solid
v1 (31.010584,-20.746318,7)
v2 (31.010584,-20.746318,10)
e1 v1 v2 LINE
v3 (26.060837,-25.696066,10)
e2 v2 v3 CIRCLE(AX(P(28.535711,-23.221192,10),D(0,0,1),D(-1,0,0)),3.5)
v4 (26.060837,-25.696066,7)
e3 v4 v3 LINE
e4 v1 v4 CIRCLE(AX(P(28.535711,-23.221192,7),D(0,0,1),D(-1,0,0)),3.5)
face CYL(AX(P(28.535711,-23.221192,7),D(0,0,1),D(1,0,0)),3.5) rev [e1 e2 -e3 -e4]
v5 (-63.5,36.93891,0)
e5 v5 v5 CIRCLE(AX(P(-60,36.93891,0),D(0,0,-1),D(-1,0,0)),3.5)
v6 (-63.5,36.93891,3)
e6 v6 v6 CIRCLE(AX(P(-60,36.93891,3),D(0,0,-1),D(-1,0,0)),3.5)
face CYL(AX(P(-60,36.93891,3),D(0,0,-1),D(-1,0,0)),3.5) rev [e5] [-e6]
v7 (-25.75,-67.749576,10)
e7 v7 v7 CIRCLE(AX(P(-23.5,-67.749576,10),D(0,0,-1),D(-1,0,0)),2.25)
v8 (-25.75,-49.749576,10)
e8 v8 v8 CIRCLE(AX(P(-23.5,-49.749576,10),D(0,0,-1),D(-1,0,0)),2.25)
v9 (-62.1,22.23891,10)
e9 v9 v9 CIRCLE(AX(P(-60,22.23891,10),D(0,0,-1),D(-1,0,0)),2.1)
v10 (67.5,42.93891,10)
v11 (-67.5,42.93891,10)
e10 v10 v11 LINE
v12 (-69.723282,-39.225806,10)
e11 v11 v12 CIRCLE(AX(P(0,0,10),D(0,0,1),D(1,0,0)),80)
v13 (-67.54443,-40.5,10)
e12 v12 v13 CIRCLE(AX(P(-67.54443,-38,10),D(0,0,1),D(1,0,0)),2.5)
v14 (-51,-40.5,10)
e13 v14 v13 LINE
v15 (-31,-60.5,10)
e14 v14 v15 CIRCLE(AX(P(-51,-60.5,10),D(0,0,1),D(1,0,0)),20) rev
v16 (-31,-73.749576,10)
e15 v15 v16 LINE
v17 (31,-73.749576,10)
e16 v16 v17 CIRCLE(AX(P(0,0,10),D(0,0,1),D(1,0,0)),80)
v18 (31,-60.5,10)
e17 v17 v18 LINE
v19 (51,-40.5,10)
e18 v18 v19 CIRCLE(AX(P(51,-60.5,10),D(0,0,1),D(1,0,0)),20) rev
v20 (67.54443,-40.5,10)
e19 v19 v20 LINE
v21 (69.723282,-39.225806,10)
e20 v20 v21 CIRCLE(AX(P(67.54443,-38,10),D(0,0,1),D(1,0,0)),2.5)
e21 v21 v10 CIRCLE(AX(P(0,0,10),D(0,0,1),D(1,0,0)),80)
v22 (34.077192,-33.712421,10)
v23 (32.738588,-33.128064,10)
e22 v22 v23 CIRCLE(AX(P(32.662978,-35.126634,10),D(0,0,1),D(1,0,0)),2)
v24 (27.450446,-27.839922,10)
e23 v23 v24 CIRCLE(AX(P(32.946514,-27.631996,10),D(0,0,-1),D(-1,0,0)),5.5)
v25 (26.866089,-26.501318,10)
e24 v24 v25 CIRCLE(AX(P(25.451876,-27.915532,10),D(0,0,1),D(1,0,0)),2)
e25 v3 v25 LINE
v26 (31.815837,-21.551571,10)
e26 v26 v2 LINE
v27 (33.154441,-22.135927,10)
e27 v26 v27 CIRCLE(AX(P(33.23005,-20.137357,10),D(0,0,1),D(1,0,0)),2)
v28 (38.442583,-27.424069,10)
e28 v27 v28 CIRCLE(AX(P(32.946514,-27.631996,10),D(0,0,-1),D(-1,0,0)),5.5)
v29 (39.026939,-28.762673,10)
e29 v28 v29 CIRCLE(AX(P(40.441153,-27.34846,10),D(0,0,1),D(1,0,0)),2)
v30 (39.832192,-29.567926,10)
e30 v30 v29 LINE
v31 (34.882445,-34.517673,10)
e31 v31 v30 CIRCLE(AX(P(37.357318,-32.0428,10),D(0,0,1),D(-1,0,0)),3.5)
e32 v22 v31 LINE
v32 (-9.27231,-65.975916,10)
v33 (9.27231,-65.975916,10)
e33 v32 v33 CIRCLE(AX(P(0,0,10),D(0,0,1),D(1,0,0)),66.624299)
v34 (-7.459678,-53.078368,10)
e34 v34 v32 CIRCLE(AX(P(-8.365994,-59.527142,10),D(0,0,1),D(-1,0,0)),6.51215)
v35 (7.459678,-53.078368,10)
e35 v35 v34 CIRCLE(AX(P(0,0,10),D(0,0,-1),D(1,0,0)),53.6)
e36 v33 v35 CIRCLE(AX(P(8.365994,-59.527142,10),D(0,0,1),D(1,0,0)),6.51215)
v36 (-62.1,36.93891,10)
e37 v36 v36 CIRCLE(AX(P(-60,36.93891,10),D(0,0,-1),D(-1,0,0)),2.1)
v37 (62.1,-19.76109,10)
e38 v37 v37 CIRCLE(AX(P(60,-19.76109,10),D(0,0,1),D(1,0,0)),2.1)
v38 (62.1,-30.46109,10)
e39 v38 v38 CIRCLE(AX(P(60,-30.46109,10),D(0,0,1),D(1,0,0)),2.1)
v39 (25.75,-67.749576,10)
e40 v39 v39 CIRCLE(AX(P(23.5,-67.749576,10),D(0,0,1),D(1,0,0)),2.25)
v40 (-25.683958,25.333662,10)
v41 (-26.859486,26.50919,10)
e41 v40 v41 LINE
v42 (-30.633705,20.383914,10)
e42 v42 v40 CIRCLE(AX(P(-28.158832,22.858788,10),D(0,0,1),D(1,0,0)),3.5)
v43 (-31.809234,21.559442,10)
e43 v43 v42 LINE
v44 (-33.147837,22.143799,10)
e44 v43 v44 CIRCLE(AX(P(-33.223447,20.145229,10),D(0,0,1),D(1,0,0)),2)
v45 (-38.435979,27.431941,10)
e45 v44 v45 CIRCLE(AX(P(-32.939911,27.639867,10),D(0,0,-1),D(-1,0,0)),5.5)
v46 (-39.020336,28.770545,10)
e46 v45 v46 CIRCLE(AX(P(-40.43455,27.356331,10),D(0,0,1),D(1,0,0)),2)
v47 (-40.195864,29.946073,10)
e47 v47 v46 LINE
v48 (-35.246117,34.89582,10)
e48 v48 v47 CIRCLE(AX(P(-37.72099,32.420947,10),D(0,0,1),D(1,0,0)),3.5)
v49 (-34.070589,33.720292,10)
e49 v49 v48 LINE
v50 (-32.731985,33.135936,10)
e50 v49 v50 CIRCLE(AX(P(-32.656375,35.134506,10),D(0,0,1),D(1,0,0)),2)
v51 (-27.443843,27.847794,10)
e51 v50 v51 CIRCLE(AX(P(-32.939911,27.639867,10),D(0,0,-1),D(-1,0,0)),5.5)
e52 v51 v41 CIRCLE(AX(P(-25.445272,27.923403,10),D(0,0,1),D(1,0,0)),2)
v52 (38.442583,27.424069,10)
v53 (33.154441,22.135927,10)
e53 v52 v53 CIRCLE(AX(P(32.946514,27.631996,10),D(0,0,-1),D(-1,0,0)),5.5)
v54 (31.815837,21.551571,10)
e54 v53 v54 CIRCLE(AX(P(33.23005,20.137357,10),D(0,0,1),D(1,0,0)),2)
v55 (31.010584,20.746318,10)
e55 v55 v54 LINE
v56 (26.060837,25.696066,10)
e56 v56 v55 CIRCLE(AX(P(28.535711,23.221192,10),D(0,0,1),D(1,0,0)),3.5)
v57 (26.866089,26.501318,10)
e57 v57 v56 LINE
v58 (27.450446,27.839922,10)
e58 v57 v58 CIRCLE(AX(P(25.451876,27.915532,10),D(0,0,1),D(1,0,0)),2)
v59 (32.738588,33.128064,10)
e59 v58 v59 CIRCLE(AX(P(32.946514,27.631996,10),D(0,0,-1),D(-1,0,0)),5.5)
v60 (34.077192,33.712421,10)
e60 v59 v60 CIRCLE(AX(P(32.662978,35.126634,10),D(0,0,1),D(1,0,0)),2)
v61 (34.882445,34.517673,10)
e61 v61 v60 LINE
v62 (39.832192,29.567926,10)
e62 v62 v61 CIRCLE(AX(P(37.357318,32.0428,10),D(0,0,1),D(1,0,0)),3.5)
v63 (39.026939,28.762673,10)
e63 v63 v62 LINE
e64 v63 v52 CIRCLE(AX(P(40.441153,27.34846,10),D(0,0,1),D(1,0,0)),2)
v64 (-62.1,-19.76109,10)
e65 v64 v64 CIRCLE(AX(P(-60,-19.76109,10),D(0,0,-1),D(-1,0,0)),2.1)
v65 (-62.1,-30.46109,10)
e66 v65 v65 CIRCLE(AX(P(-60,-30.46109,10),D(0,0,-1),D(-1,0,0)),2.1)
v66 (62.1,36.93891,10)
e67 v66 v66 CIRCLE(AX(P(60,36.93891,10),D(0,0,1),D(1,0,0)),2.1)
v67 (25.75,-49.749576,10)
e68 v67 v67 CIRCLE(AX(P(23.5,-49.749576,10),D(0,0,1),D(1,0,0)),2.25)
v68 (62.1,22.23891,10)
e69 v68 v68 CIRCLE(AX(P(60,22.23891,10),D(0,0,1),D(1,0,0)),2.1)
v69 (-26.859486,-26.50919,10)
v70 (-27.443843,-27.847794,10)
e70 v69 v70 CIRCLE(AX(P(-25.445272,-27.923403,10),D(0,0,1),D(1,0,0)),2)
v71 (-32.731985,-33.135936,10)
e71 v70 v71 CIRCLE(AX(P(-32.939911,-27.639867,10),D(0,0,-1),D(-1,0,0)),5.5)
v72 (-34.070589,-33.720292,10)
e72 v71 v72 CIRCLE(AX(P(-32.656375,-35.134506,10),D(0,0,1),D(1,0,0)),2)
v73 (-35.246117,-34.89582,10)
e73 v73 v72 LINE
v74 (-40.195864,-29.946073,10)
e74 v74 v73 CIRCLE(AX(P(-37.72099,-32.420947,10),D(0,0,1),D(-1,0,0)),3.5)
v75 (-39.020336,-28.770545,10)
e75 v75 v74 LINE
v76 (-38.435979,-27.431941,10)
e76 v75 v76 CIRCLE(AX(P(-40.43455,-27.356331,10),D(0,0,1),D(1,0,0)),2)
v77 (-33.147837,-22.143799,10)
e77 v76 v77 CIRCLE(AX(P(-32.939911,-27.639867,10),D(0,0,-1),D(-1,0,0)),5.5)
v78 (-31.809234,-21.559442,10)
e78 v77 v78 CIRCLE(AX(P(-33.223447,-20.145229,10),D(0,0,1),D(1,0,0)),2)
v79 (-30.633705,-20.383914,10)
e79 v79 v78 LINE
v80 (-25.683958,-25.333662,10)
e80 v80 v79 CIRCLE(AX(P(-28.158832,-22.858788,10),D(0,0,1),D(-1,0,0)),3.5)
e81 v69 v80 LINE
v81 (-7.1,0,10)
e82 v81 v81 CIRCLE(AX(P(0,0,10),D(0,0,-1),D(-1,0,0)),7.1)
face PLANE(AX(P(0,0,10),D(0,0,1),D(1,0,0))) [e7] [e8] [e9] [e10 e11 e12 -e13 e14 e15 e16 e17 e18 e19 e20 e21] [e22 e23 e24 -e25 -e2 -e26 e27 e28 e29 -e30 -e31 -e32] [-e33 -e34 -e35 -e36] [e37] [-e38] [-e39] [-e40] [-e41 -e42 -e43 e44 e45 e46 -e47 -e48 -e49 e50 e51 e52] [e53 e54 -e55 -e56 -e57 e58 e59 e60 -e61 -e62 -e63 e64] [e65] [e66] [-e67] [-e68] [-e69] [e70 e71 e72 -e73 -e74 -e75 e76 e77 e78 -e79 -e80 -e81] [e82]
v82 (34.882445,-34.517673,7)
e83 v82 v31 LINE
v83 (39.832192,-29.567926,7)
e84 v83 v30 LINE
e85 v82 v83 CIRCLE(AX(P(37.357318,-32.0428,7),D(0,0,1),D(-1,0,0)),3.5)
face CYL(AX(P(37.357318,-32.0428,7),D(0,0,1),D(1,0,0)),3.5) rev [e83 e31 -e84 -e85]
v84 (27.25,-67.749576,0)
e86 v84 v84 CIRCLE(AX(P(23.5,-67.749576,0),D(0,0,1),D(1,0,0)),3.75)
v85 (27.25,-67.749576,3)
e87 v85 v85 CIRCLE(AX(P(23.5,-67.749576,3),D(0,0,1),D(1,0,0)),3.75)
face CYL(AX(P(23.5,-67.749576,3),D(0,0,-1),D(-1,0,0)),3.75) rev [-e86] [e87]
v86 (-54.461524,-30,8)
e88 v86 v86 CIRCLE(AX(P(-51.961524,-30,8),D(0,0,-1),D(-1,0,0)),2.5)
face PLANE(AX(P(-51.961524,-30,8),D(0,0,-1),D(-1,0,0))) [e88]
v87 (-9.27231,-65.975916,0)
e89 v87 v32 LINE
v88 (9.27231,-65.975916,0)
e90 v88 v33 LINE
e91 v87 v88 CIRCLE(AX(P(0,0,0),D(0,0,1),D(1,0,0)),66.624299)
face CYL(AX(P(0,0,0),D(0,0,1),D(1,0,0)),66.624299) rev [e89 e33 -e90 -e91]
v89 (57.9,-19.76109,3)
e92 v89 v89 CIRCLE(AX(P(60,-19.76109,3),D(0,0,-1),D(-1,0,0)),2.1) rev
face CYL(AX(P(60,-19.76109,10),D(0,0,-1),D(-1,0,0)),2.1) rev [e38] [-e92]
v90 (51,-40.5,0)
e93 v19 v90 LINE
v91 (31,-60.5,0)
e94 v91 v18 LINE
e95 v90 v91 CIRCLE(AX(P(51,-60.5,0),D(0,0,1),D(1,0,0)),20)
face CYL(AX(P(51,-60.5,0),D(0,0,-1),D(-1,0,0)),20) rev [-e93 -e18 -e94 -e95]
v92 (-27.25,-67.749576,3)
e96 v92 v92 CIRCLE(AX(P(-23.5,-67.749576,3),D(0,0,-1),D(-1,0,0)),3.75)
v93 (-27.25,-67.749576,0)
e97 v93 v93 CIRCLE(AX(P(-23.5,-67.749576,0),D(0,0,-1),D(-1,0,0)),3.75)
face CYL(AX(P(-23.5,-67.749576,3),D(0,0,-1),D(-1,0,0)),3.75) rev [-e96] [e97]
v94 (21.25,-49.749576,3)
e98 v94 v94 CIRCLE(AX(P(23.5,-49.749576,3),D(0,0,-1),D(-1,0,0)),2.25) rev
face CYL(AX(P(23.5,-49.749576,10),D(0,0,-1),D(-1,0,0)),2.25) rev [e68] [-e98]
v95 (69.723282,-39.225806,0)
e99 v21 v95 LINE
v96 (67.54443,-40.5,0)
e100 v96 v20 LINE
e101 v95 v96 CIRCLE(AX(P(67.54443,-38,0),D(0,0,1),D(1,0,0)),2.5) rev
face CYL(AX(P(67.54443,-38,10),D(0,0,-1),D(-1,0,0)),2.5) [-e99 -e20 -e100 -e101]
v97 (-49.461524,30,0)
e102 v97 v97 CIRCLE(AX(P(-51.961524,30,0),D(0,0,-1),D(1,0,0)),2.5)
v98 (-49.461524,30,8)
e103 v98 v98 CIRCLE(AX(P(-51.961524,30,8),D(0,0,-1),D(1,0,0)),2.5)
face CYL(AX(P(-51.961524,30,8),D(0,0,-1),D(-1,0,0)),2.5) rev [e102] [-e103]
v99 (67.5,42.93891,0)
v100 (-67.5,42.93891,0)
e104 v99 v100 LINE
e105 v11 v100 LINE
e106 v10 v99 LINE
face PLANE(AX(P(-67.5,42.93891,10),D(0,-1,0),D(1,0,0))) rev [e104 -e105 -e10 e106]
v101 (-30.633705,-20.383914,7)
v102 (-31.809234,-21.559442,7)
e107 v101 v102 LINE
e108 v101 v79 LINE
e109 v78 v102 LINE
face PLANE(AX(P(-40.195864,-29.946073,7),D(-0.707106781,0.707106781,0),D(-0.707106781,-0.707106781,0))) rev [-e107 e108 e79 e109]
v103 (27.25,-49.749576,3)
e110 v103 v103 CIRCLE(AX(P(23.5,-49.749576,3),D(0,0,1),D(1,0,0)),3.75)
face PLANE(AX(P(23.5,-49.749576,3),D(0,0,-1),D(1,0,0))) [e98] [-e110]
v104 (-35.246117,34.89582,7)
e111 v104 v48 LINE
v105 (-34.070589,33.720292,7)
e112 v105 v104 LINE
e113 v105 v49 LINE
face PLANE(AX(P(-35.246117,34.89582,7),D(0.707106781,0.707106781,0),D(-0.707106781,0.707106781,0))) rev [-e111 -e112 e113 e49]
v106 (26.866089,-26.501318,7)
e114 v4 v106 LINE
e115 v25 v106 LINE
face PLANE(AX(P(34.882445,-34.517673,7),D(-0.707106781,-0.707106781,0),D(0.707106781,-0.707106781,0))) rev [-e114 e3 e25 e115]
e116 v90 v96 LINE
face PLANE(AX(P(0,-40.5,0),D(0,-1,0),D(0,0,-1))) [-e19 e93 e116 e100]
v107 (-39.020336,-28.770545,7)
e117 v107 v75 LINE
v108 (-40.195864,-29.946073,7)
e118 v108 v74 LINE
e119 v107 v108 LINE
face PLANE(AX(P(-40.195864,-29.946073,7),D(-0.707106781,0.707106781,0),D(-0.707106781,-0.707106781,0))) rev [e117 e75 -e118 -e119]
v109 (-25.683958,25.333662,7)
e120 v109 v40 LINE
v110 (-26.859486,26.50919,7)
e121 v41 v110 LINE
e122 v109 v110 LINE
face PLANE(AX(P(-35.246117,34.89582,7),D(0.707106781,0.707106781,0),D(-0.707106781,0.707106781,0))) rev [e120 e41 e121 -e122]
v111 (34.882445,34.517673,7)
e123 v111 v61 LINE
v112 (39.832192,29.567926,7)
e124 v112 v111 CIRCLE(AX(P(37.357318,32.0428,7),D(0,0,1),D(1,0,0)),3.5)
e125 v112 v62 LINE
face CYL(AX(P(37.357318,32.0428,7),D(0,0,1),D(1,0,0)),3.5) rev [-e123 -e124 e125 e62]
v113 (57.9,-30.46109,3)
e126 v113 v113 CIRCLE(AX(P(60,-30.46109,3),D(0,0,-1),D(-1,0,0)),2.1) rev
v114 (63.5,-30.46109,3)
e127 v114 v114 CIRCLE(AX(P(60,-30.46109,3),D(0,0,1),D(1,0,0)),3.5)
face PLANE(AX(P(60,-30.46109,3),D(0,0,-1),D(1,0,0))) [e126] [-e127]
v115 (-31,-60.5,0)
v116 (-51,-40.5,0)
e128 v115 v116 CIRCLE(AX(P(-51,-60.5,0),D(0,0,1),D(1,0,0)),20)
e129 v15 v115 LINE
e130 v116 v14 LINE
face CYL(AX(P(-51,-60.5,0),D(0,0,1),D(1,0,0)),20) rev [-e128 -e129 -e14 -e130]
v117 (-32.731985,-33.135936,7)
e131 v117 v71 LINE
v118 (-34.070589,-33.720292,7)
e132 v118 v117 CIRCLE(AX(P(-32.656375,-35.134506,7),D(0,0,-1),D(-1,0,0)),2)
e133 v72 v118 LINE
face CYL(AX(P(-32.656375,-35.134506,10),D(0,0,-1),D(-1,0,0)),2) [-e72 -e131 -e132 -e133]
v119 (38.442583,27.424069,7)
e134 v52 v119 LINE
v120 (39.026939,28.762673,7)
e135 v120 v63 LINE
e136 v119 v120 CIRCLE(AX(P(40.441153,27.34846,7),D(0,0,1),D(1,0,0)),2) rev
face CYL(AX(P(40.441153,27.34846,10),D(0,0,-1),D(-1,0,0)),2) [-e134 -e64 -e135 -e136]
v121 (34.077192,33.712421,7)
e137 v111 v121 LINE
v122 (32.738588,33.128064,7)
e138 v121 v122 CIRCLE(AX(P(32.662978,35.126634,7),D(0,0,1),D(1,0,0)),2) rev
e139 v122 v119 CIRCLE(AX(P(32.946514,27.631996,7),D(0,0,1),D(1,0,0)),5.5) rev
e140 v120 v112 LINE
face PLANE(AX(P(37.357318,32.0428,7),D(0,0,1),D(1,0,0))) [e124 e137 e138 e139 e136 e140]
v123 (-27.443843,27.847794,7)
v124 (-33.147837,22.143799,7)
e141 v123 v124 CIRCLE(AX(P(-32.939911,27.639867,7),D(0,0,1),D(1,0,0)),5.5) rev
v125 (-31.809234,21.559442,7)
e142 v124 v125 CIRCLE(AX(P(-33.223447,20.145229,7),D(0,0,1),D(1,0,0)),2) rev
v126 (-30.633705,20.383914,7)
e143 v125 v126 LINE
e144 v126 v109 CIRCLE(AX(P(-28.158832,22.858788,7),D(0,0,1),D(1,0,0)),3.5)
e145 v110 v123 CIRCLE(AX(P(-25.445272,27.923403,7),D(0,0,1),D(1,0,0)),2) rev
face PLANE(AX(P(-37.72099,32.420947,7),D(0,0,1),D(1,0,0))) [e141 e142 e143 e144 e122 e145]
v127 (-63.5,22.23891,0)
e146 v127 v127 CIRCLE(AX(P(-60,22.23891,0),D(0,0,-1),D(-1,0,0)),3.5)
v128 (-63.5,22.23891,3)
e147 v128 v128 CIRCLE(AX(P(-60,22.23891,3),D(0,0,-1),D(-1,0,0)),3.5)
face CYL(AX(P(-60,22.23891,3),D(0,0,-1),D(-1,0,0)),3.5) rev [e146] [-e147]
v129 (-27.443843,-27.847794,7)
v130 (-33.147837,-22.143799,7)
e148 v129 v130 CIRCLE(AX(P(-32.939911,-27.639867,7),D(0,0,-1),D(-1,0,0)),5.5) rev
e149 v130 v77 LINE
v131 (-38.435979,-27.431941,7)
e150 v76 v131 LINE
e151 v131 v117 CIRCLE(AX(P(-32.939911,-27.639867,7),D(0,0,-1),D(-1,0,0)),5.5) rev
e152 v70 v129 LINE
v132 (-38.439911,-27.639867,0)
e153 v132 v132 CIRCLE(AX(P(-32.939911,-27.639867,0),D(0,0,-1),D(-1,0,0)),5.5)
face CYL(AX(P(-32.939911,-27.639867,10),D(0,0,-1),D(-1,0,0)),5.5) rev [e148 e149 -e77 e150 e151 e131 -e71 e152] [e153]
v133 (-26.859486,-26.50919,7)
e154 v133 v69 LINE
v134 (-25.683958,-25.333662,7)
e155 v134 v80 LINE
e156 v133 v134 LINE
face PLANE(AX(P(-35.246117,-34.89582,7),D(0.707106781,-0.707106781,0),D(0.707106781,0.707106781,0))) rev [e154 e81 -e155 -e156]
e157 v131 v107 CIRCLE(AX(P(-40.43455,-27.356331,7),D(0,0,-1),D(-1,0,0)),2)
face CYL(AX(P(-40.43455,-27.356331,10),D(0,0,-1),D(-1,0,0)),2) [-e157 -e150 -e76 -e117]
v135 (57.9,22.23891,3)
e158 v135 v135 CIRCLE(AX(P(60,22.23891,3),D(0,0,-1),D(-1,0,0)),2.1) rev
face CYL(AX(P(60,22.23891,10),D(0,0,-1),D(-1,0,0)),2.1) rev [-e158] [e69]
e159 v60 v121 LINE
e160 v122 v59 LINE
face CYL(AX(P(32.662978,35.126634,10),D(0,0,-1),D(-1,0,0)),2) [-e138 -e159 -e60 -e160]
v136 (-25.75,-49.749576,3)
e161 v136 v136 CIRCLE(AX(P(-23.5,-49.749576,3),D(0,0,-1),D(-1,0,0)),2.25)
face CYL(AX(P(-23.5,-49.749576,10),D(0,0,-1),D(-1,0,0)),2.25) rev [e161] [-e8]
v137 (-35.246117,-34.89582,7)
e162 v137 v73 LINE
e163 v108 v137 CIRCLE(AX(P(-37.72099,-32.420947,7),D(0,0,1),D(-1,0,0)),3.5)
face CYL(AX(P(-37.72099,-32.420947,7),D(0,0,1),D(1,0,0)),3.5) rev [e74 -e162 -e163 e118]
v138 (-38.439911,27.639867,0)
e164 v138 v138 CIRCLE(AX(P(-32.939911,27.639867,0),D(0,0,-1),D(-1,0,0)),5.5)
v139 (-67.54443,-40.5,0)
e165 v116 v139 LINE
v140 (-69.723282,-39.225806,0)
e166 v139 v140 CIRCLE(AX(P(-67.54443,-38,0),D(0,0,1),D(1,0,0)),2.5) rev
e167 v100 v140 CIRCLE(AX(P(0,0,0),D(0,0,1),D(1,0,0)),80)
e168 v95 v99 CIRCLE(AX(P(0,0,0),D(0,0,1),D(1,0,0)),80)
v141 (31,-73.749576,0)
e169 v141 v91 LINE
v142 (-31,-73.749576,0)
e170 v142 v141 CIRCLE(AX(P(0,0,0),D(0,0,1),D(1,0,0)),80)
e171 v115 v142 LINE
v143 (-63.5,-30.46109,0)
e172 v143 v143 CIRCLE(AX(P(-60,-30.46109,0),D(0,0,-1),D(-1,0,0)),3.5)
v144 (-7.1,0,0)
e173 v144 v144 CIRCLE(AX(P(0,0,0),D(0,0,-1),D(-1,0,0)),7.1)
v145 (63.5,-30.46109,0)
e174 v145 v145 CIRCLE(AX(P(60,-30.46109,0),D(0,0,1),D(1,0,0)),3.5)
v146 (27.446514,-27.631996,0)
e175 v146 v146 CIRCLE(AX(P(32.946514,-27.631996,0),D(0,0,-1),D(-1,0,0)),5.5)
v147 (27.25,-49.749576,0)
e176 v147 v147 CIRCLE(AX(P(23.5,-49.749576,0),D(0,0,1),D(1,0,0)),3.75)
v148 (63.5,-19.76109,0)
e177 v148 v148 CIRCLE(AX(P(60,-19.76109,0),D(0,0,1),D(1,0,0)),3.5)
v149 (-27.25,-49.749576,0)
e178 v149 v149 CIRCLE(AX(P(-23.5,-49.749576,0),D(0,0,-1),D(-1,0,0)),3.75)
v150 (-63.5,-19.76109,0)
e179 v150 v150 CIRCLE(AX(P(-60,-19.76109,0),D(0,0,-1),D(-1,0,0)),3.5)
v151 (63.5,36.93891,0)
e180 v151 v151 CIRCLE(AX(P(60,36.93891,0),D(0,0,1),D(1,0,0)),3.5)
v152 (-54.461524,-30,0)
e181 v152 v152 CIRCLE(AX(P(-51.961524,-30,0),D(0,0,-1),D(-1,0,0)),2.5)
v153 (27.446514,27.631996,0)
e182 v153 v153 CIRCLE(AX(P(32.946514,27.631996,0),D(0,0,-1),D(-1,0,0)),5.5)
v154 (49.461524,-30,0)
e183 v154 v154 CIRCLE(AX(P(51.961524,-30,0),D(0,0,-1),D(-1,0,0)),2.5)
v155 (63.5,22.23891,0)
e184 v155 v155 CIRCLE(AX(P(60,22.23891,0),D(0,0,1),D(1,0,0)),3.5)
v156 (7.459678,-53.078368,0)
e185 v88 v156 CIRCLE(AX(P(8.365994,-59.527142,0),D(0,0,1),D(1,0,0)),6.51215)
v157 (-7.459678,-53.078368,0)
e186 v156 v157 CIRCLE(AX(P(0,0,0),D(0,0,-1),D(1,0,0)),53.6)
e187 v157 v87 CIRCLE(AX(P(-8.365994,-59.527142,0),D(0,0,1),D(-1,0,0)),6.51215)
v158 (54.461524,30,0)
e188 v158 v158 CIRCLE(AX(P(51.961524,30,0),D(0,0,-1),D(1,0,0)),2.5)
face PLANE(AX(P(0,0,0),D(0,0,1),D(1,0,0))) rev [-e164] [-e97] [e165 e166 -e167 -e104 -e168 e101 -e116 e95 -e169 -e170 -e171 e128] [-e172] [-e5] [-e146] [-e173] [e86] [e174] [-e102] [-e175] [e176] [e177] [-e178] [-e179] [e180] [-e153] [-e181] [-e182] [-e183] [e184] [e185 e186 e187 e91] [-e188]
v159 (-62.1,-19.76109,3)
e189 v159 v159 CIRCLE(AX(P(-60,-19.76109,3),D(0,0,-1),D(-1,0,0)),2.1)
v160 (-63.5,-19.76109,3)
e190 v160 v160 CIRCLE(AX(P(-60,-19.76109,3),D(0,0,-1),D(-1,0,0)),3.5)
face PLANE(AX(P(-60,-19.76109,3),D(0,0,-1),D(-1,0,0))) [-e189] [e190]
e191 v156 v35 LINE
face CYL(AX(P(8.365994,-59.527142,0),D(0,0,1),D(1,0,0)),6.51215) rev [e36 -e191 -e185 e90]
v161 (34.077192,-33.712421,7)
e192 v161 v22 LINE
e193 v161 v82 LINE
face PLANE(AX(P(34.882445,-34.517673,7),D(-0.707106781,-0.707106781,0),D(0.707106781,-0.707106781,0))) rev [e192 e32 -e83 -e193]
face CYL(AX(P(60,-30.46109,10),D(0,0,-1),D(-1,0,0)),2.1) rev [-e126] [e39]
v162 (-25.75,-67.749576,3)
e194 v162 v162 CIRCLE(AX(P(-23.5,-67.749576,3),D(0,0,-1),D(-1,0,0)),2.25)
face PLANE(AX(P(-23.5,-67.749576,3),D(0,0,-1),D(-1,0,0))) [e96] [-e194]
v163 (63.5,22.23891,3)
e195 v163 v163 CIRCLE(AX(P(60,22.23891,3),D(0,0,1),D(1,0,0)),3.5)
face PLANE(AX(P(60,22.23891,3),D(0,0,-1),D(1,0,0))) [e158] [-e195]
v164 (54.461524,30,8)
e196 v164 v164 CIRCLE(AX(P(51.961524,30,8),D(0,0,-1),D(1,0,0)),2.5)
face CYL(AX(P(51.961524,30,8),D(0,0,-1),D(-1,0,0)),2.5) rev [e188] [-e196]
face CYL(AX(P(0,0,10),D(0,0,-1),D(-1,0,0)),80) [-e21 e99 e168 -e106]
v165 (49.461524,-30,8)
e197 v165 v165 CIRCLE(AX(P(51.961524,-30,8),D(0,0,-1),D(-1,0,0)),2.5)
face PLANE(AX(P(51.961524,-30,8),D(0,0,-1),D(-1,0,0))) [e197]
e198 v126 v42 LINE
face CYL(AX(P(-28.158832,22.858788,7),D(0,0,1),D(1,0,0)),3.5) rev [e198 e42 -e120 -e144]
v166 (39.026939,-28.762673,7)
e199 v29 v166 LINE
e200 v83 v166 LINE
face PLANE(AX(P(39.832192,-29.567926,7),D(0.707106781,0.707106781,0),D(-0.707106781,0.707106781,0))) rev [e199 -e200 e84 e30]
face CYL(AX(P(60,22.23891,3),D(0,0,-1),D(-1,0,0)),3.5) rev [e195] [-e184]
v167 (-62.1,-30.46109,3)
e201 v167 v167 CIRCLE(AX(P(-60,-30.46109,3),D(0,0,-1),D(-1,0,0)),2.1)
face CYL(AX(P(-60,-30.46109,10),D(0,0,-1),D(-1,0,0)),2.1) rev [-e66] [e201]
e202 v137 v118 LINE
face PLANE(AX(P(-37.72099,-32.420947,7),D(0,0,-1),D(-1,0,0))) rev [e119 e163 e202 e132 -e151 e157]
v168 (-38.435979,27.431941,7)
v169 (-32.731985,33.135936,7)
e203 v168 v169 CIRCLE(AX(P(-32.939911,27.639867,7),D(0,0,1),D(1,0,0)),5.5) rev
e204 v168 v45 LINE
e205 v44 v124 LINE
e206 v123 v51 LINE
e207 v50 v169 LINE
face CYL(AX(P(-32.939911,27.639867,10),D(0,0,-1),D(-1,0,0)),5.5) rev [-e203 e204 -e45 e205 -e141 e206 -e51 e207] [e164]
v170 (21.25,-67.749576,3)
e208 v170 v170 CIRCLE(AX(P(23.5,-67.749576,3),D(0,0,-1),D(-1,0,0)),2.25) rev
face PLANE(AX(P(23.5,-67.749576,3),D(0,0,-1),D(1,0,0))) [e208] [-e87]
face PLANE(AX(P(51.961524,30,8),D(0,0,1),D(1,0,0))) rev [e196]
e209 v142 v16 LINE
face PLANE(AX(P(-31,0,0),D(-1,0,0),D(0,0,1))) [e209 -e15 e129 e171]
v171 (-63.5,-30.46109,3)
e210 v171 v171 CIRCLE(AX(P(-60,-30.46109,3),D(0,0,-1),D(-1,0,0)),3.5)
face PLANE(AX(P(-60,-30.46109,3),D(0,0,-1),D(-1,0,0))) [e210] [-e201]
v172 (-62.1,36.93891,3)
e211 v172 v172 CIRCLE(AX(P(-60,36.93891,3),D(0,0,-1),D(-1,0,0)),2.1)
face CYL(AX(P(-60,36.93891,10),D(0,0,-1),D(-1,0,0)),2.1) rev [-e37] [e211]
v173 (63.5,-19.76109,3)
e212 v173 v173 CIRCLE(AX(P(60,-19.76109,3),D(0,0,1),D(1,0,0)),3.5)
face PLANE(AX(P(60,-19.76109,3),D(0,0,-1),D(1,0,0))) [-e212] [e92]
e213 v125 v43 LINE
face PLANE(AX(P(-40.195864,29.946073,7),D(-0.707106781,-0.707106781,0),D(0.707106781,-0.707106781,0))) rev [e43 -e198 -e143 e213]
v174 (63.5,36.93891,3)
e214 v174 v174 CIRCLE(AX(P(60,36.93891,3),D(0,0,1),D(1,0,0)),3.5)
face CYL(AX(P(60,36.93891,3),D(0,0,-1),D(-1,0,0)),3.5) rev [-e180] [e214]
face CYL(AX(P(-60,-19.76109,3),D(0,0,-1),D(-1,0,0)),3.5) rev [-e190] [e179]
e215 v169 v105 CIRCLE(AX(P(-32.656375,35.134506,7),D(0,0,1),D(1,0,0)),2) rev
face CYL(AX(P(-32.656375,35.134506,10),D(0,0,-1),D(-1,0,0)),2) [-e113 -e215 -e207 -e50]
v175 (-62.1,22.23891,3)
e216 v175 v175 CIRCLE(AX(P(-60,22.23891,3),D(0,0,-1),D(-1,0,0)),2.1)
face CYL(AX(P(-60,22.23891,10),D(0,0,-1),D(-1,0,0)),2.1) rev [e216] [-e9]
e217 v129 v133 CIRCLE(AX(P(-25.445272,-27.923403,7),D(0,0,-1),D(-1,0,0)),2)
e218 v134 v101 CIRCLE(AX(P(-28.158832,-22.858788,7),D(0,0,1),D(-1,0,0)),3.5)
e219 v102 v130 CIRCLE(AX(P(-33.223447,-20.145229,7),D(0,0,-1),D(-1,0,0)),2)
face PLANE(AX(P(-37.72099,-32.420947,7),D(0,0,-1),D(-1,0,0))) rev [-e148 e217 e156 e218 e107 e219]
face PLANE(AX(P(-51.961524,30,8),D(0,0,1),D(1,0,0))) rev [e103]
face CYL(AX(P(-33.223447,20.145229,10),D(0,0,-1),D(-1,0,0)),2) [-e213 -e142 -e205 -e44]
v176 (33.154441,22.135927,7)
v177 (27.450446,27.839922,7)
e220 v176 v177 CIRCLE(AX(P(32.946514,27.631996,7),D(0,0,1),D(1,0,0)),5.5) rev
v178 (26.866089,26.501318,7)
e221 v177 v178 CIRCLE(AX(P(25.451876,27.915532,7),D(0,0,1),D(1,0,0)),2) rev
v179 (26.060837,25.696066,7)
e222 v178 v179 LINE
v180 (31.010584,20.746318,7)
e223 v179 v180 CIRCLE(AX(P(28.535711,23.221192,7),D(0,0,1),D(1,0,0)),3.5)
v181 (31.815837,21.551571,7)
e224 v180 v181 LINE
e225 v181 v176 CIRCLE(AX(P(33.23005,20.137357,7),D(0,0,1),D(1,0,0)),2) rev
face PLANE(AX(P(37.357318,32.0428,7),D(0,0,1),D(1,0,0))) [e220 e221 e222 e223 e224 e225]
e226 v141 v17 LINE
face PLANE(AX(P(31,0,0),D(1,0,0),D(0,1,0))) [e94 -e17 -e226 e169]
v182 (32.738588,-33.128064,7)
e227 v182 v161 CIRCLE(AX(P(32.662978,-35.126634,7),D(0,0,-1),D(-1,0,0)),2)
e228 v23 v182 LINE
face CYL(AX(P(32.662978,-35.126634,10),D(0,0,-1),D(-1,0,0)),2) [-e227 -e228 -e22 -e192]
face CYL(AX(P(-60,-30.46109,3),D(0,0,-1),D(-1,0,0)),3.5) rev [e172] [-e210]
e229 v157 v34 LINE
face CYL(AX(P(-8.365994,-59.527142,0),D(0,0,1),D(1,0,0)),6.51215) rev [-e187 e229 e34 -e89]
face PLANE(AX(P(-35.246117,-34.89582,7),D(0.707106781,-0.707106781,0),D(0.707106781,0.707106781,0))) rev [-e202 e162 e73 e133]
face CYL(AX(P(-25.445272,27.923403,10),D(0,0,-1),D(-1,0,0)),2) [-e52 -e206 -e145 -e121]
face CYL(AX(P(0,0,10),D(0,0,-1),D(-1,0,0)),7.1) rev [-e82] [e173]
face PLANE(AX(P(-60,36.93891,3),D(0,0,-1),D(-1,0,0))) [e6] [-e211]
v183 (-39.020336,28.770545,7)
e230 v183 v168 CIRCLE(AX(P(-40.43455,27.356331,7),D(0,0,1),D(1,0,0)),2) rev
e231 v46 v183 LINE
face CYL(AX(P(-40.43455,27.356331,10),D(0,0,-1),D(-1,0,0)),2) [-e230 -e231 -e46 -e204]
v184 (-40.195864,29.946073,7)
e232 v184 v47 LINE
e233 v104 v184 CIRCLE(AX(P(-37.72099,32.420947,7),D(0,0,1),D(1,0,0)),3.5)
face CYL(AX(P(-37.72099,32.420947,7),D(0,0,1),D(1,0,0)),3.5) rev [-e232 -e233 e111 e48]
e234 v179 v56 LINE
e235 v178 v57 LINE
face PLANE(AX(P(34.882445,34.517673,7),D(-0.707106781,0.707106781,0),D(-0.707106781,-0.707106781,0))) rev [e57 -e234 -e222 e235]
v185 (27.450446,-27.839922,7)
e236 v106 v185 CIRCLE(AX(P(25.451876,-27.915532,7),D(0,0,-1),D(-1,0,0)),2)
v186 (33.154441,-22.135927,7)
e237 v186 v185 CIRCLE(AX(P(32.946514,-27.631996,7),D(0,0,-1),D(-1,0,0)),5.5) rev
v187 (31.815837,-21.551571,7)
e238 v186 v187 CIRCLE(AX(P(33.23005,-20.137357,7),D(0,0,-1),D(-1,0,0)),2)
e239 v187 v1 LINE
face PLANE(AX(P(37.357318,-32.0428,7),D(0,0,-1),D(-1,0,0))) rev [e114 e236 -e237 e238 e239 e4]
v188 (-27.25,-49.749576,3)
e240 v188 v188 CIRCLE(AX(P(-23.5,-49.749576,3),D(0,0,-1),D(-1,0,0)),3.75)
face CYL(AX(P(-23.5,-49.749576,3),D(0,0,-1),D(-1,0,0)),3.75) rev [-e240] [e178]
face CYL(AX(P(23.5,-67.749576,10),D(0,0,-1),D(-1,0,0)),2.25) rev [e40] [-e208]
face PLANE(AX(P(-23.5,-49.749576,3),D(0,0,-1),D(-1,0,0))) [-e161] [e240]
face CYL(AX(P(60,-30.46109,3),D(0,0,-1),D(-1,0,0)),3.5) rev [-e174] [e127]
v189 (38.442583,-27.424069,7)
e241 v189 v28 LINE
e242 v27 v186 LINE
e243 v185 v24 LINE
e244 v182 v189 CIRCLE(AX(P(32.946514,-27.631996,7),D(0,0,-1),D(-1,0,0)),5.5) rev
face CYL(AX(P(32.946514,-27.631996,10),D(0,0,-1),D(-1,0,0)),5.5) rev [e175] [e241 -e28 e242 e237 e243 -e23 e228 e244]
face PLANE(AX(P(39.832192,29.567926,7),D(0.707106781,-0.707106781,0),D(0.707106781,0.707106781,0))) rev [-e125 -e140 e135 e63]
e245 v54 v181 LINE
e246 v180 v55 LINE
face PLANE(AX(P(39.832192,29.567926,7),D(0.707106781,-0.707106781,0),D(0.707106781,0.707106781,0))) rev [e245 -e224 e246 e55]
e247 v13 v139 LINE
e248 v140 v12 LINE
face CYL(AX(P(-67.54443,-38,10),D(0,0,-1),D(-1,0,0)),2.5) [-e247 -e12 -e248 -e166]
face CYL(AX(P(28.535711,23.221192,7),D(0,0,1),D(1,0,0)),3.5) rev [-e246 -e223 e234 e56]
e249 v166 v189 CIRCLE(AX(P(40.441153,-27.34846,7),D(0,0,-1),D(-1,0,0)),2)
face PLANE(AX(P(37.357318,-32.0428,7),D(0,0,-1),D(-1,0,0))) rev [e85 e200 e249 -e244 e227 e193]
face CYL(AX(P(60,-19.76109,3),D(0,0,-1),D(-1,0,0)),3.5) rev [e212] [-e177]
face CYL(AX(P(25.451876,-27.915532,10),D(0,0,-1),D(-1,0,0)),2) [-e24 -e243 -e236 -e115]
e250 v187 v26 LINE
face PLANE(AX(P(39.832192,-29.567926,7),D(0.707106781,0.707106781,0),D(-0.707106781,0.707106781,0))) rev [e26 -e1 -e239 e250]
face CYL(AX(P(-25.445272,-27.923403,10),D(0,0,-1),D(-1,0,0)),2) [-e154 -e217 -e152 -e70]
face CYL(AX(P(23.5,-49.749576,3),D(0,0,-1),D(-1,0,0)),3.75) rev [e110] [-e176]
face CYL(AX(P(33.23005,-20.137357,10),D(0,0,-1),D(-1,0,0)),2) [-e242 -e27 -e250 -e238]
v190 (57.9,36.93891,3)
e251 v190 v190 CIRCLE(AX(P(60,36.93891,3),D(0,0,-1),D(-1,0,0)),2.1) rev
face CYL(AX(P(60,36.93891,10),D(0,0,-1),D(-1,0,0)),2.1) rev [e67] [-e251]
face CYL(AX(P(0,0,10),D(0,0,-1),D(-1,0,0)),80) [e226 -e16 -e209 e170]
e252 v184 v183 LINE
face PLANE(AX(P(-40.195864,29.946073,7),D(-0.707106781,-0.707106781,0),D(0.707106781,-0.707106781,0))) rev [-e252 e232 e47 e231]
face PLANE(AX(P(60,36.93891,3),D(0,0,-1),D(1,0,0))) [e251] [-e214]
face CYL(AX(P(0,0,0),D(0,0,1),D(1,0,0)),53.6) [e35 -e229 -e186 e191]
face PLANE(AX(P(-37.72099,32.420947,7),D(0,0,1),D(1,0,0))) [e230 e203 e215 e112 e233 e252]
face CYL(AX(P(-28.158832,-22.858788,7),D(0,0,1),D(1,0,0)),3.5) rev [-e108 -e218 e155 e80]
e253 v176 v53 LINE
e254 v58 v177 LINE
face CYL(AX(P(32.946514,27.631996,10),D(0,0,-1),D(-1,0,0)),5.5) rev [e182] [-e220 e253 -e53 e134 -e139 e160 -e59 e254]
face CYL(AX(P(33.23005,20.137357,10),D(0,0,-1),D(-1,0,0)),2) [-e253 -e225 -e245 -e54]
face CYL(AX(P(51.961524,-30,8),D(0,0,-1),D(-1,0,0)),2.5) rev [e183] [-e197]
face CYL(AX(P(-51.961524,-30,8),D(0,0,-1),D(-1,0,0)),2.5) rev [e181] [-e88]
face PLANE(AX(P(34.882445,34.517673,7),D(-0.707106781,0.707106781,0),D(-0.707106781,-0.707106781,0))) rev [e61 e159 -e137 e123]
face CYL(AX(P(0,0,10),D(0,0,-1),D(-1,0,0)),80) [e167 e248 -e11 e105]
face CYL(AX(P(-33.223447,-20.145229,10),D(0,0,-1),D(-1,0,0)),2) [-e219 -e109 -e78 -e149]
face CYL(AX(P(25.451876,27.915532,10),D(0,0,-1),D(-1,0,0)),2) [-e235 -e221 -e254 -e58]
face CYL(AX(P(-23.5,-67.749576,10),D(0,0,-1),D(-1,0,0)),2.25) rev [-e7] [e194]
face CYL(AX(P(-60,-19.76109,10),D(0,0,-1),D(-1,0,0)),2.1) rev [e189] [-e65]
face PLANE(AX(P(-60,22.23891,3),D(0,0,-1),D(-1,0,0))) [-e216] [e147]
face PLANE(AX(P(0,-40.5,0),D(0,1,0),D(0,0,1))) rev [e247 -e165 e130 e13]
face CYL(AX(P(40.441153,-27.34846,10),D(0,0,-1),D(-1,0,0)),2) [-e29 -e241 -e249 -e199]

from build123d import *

# Parameters (mm, degrees)
EXTRUDE_2_DEPTH      = 10
SKETCH_6_R           = 2.5
CUT_EXTRUDE_1_DEPTH  = 8
SKETCH_7_R           = 5.5
CUT_EXTRUDE_2_DEPTH  = 114.578166916
CUT_EXTRUDE_3_DEPTH  = 114.578166916
CUT_EXTRUDE_4_DEPTH  = 3
FILLET_1_R           = 2
CUT_EXTRUDE_7_DEPTH  = 114.578166916
SKETCH_16_R          = 3.5
CUT_EXTRUDE_8_DEPTH  = 3
SKETCH_18_R          = 2.1
CUT_EXTRUDE_9_DEPTH  = 114.578166916
FILLET_2_R           = 20
FILLET_3_R           = 2.5
SKETCH_20_R          = 3.75
CUT_EXTRUDE_11_DEPTH = 3
SKETCH_21_R          = 2.25
CUT_EXTRUDE_12_DEPTH = 114.578166916
SKETCH_22_R          = 7.1
CUT_EXTRUDE_13_DEPTH = 114.578166916


with BuildPart() as part:
    # 草图5 → 凸台-拉伸2 (new body)
    with BuildSketch(Plane.XY):
        with BuildLine():
            Line((-67.5, 42.938910093), (67.5, 42.938910093))
            ThreePointArc((67.5, 42.938910093), (0, -80), (-67.5, 42.938910093))
        make_face()
    extrude(amount=EXTRUDE_2_DEPTH)

    # 草图6 → 切除-拉伸1 (cut)
    with BuildSketch(Plane(origin=(0, 0, 0), x_dir=(-1, 0, 0), z_dir=(0, 0, -1))):
        with Locations(Location((-51.961524227, 30, 0), (0, 0, 180))):
            Circle(SKETCH_6_R)
        with Locations((-51.961524227, -30)):
            Circle(SKETCH_6_R)
        with Locations((51.961524227, -30)):
            Circle(SKETCH_6_R)
        with Locations(Location((51.961524227, 30, 0), (0, 0, 180))):
            Circle(SKETCH_6_R)
    extrude(amount=-CUT_EXTRUDE_1_DEPTH, mode=Mode.SUBTRACT)

    # 草图7 → 切除-拉伸2 (cut, through all)
    with BuildSketch(Plane(origin=(0, 0, 0), x_dir=(-1, 0, 0), z_dir=(0, 0, -1))):
        with Locations((32.939911054, -27.639867217)):
            Circle(SKETCH_7_R)
        with Locations((32.939911054, 27.639867217)):
            Circle(SKETCH_7_R)
        with Locations((-32.946514438, 27.631995701)):
            Circle(SKETCH_7_R)
        with Locations((-32.946514438, -27.631995701)):
            Circle(SKETCH_7_R)
    extrude(amount=-CUT_EXTRUDE_2_DEPTH, mode=Mode.SUBTRACT)

    # 草图8 → 切除-拉伸3 (cut, through all)
    with BuildSketch(Plane.XY.offset(10)):
        with BuildLine():
            ThreePointArc((-9.2723103, -65.975915967), (0, -66.624299065), (9.2723103, -65.975915967))
            ThreePointArc((9.2723103, -65.975915967), (14.814767997, -58.620826181), (7.459678211, -53.078368485))
            ThreePointArc((7.459678211, -53.078368485), (0, -53.6), (-7.459678211, -53.078368485))
            ThreePointArc((-7.459678211, -53.078368485), (-14.814767997, -58.620826181), (-9.2723103, -65.975915967))
        make_face()
    extrude(amount=-CUT_EXTRUDE_3_DEPTH, mode=Mode.SUBTRACT)

    # 草图9 → 切除-拉伸4 (cut)
    with BuildSketch(Plane.XY.offset(10)):
        with BuildLine():
            Line((-35.246116648, 34.895820279), (-25.683957992, 25.333661623))
            ThreePointArc((-25.683957992, 25.333661623), (-25.683957992, 20.383914155), (-30.63370546, 20.383914155))
            Line((-30.63370546, 20.383914155), (-40.195864116, 29.94607281))
            ThreePointArc((-40.195864116, 29.94607281), (-40.195864116, 34.895820279), (-35.246116648, 34.895820279))
        make_face()
        with BuildLine():
            Line((39.832192061, 29.567925856), (31.010584282, 20.746318078))
            ThreePointArc((31.010584282, 20.746318078), (26.060836814, 20.746318078), (26.060836814, 25.696065546))
            Line((26.060836814, 25.696065546), (34.882444593, 34.517673324))
            ThreePointArc((34.882444593, 34.517673324), (39.832192061, 34.517673324), (39.832192061, 29.567925856))
        make_face()
        with BuildLine():
            Line((-35.246116648, -34.895820279), (-25.683957992, -25.333661623))
            ThreePointArc((-25.683957992, -25.333661623), (-25.683957992, -20.383914155), (-30.63370546, -20.383914155))
            Line((-30.63370546, -20.383914155), (-40.195864116, -29.94607281))
            ThreePointArc((-40.195864116, -29.94607281), (-40.195864116, -34.895820279), (-35.246116648, -34.895820279))
        make_face()
        with BuildLine():
            Line((39.832192061, -29.567925856), (31.010584282, -20.746318078))
            ThreePointArc((31.010584282, -20.746318078), (26.060836814, -20.746318078), (26.060836814, -25.696065546))
            Line((26.060836814, -25.696065546), (34.882444593, -34.517673324))
            ThreePointArc((34.882444593, -34.517673324), (39.832192061, -34.517673324), (39.832192061, -29.567925856))
        make_face()
    extrude(amount=-CUT_EXTRUDE_4_DEPTH, mode=Mode.SUBTRACT)

    # 圆角1
    # the kernel refuses this fillet: 2 mm, written as the material it takes off along each edge
    with BuildSketch(Plane(origin=(32.421388172, -22.157121967, 12.140947066), x_dir=(0.9995822889813627, 0.028900649729367227, 0), z_dir=(0, 0, -1)), Plane(origin=(33.471640703, -33.106869435, 12.140947066), x_dir=(-0.9995822889813627, -0.028900649729367227, 0), z_dir=(0, 0, -1)), Plane(origin=(38.421388172, 28.157121967, 12.140947066), x_dir=(0.028900649729366526, -0.9995822889813627, 0), z_dir=(0, 0, -1)), Plane(origin=(27.471640703, 27.106869435, 12.140947066), x_dir=(-0.028900649729366384, 0.9995822889813627, 0), z_dir=(0, 0, -1)), Plane(origin=(-33.46503732, 33.114740951, 12.140947066), x_dir=(0.9995822889813627, 0.028900649729368344, 0), z_dir=(0, 0, -1)), Plane(origin=(-32.414784788, 22.164993482, 12.140947066), x_dir=(-0.9995822889813627, -0.028900649729368344, 0), z_dir=(0, 0, -1)), Plane(origin=(-27.46503732, -27.114740951, 12.140947066), x_dir=(0.028900649729362526, -0.9995822889813628, 0), z_dir=(0, 0, -1)), Plane(origin=(-38.414784788, -28.164993482, 12.140947066), x_dir=(-0.028900649729357547, 0.9995822889813629, 0), z_dir=(0, 0, -1))) as fillet_1_piece_1:
        with BuildLine():
            CenterArc((0.866697016, -1.995550294), FILLET_1_R, 93.822687788, 42.833428066)
            Line((-0.587797505, -0.622799155), (0, 0))
            ThreePointArc((0, 0), (0.366679507, -0.012236691), (0.733359013, 0))
        make_face()
    extrude(amount=5.140947066, mode=Mode.SUBTRACT)
    with BuildSketch(Plane(origin=(27.471640703, -27.106869435, 12.140947066), x_dir=(-0.028900649729367366, -0.9995822889813627, 0), z_dir=(0, 0, -1)), Plane(origin=(38.421388172, -28.157121967, 12.140947066), x_dir=(0.028900649729367924, 0.9995822889813627, 0), z_dir=(0, 0, -1)), Plane(origin=(33.471640703, 33.106869435, 12.140947066), x_dir=(-0.9995822889813627, 0.028900649729367227, 0), z_dir=(0, 0, -1)), Plane(origin=(32.421388172, 22.157121967, 12.140947066), x_dir=(0.9995822889813627, -0.028900649729367227, 0), z_dir=(0, 0, -1)), Plane(origin=(-38.414784788, 28.164993482, 12.140947066), x_dir=(-0.028900649729367647, -0.9995822889813627, 0), z_dir=(0, 0, -1)), Plane(origin=(-27.46503732, 27.114740951, 12.140947066), x_dir=(0.028900649729362664, 0.9995822889813628, 0), z_dir=(0, 0, -1)), Plane(origin=(-32.414784788, -22.164993482, 12.140947066), x_dir=(-0.9995822889813627, 0.028900649729368066, 0), z_dir=(0, 0, -1)), Plane(origin=(-33.46503732, -33.114740951, 12.140947066), x_dir=(0.9995822889813627, -0.028900649729367785, 0), z_dir=(0, 0, -1))) as fillet_1_piece_2:
        with BuildLine():
            CenterArc((0.866697016, 1.995550294), FILLET_1_R, 223.343884146, 42.833428066)
            Line((-0.587797505, 0.622799155), (0, 0))
            ThreePointArc((0, 0), (0.366679507, 0.012236691), (0.733359013, 0))
        make_face()
    extrude(amount=5.140947066, mode=Mode.SUBTRACT)

    # 草图13 → 切除-拉伸7 (cut, through all)
    with BuildSketch(Plane.XY.offset(10)):
        with BuildLine():
            Line((-31, -40.5), (-64.208177049, -40.5))
            Line((-64.208177049, -40.5), (-68.990941434, -40.5))
            ThreePointArc((-68.990941434, -40.5), (-52.687101579, -60.200243581), (-31, -73.74957627))
            Line((-31, -73.74957627), (-31, -40.5))
        make_face()
        with BuildLine():
            Line((31, -40.5), (31, -73.74957627))
            ThreePointArc((31, -73.74957627), (52.687101579, -60.200243581), (68.990941434, -40.5))
            Line((68.990941434, -40.5), (31, -40.5))
        make_face()
    extrude(amount=-CUT_EXTRUDE_7_DEPTH, mode=Mode.SUBTRACT)

    # 草图16 → 切除-拉伸8 (cut)
    with BuildSketch(Plane(origin=(0, 0, 0), x_dir=(-1, 0, 0), z_dir=(0, 0, -1))):
        with Locations((60, 36.938910093)):
            Circle(SKETCH_16_R)
        with Locations((60, 22.238910093)):
            Circle(SKETCH_16_R)
        with Locations((60, -19.761089907)):
            Circle(SKETCH_16_R)
        with Locations((60, -30.461089907)):
            Circle(SKETCH_16_R)
    cut_extrude_8 = extrude(amount=-CUT_EXTRUDE_8_DEPTH, mode=Mode.SUBTRACT)

    # 草图18 → 切除-拉伸9 (cut, through all)
    with BuildSketch(Plane(origin=(0, 0, 0), x_dir=(-1, 0, 0), z_dir=(0, 0, -1))):
        with Locations((60, -30.461089907)):
            Circle(SKETCH_18_R)
        with Locations((60, -19.761089907)):
            Circle(SKETCH_18_R)
        with Locations((60, 22.238910093)):
            Circle(SKETCH_18_R)
        with Locations((60, 36.938910093)):
            Circle(SKETCH_18_R)
    cut_extrude_9 = extrude(amount=-CUT_EXTRUDE_9_DEPTH, mode=Mode.SUBTRACT)

    # 镜向1: 切除-拉伸8, 切除-拉伸9 across plane
    add(cut_extrude_8.mirror(Plane(origin=(0, 0, 0), x_dir=(0, 0, 1), z_dir=(1, 0, 0))), mode=Mode.SUBTRACT)
    add(cut_extrude_9.mirror(Plane(origin=(0, 0, 0), x_dir=(0, 0, 1), z_dir=(1, 0, 0))), mode=Mode.SUBTRACT)

    # 圆角2
    fillet_2_edges = [part.edges().sort_by_distance(p)[0] for p in [
        (-31, -40.5, 5),
        (31, -40.5, 5),
    ]]
    fillet(fillet_2_edges, radius=FILLET_2_R)

    # 圆角3
    fillet_3_edges = [part.edges().sort_by_distance(p)[0] for p in [
        (-68.990941434, -40.5, 5),
        (68.990941434, -40.5, 5),
    ]]
    fillet(fillet_3_edges, radius=FILLET_3_R)

    # 草图20 → 切除-拉伸11 (cut)
    with BuildSketch(Plane(origin=(0, 0, 0), x_dir=(-1, 0, 0), z_dir=(0, 0, -1))):
        with Locations((23.5, -67.74957627)):
            Circle(SKETCH_20_R)
        with Locations((23.5, -49.74957627)):
            Circle(SKETCH_20_R)
    cut_extrude_11 = extrude(amount=-CUT_EXTRUDE_11_DEPTH, mode=Mode.SUBTRACT)

    # 草图21 → 切除-拉伸12 (cut, through all)
    with BuildSketch(Plane(origin=(0, 0, 0), x_dir=(-1, 0, 0), z_dir=(0, 0, -1))):
        with Locations((23.5, -49.74957627)):
            Circle(SKETCH_21_R)
        with Locations((23.5, -67.74957627)):
            Circle(SKETCH_21_R)
    cut_extrude_12 = extrude(amount=-CUT_EXTRUDE_12_DEPTH, mode=Mode.SUBTRACT)

    # 镜向2: 切除-拉伸11, 切除-拉伸12 across plane
    add(cut_extrude_11.mirror(Plane(origin=(0, 0, 0), x_dir=(0, 0, 1), z_dir=(1, 0, 0))), mode=Mode.SUBTRACT)
    add(cut_extrude_12.mirror(Plane(origin=(0, 0, 0), x_dir=(0, 0, 1), z_dir=(1, 0, 0))), mode=Mode.SUBTRACT)

    # 草图22 → 切除-拉伸13 (cut, through all)
    with BuildSketch(Plane(origin=(0, 0, 0), x_dir=(-1, 0, 0), z_dir=(0, 0, -1))):
        Circle(SKETCH_22_R)
    extrude(amount=-CUT_EXTRUDE_13_DEPTH, mode=Mode.SUBTRACT)


solid = part.part
